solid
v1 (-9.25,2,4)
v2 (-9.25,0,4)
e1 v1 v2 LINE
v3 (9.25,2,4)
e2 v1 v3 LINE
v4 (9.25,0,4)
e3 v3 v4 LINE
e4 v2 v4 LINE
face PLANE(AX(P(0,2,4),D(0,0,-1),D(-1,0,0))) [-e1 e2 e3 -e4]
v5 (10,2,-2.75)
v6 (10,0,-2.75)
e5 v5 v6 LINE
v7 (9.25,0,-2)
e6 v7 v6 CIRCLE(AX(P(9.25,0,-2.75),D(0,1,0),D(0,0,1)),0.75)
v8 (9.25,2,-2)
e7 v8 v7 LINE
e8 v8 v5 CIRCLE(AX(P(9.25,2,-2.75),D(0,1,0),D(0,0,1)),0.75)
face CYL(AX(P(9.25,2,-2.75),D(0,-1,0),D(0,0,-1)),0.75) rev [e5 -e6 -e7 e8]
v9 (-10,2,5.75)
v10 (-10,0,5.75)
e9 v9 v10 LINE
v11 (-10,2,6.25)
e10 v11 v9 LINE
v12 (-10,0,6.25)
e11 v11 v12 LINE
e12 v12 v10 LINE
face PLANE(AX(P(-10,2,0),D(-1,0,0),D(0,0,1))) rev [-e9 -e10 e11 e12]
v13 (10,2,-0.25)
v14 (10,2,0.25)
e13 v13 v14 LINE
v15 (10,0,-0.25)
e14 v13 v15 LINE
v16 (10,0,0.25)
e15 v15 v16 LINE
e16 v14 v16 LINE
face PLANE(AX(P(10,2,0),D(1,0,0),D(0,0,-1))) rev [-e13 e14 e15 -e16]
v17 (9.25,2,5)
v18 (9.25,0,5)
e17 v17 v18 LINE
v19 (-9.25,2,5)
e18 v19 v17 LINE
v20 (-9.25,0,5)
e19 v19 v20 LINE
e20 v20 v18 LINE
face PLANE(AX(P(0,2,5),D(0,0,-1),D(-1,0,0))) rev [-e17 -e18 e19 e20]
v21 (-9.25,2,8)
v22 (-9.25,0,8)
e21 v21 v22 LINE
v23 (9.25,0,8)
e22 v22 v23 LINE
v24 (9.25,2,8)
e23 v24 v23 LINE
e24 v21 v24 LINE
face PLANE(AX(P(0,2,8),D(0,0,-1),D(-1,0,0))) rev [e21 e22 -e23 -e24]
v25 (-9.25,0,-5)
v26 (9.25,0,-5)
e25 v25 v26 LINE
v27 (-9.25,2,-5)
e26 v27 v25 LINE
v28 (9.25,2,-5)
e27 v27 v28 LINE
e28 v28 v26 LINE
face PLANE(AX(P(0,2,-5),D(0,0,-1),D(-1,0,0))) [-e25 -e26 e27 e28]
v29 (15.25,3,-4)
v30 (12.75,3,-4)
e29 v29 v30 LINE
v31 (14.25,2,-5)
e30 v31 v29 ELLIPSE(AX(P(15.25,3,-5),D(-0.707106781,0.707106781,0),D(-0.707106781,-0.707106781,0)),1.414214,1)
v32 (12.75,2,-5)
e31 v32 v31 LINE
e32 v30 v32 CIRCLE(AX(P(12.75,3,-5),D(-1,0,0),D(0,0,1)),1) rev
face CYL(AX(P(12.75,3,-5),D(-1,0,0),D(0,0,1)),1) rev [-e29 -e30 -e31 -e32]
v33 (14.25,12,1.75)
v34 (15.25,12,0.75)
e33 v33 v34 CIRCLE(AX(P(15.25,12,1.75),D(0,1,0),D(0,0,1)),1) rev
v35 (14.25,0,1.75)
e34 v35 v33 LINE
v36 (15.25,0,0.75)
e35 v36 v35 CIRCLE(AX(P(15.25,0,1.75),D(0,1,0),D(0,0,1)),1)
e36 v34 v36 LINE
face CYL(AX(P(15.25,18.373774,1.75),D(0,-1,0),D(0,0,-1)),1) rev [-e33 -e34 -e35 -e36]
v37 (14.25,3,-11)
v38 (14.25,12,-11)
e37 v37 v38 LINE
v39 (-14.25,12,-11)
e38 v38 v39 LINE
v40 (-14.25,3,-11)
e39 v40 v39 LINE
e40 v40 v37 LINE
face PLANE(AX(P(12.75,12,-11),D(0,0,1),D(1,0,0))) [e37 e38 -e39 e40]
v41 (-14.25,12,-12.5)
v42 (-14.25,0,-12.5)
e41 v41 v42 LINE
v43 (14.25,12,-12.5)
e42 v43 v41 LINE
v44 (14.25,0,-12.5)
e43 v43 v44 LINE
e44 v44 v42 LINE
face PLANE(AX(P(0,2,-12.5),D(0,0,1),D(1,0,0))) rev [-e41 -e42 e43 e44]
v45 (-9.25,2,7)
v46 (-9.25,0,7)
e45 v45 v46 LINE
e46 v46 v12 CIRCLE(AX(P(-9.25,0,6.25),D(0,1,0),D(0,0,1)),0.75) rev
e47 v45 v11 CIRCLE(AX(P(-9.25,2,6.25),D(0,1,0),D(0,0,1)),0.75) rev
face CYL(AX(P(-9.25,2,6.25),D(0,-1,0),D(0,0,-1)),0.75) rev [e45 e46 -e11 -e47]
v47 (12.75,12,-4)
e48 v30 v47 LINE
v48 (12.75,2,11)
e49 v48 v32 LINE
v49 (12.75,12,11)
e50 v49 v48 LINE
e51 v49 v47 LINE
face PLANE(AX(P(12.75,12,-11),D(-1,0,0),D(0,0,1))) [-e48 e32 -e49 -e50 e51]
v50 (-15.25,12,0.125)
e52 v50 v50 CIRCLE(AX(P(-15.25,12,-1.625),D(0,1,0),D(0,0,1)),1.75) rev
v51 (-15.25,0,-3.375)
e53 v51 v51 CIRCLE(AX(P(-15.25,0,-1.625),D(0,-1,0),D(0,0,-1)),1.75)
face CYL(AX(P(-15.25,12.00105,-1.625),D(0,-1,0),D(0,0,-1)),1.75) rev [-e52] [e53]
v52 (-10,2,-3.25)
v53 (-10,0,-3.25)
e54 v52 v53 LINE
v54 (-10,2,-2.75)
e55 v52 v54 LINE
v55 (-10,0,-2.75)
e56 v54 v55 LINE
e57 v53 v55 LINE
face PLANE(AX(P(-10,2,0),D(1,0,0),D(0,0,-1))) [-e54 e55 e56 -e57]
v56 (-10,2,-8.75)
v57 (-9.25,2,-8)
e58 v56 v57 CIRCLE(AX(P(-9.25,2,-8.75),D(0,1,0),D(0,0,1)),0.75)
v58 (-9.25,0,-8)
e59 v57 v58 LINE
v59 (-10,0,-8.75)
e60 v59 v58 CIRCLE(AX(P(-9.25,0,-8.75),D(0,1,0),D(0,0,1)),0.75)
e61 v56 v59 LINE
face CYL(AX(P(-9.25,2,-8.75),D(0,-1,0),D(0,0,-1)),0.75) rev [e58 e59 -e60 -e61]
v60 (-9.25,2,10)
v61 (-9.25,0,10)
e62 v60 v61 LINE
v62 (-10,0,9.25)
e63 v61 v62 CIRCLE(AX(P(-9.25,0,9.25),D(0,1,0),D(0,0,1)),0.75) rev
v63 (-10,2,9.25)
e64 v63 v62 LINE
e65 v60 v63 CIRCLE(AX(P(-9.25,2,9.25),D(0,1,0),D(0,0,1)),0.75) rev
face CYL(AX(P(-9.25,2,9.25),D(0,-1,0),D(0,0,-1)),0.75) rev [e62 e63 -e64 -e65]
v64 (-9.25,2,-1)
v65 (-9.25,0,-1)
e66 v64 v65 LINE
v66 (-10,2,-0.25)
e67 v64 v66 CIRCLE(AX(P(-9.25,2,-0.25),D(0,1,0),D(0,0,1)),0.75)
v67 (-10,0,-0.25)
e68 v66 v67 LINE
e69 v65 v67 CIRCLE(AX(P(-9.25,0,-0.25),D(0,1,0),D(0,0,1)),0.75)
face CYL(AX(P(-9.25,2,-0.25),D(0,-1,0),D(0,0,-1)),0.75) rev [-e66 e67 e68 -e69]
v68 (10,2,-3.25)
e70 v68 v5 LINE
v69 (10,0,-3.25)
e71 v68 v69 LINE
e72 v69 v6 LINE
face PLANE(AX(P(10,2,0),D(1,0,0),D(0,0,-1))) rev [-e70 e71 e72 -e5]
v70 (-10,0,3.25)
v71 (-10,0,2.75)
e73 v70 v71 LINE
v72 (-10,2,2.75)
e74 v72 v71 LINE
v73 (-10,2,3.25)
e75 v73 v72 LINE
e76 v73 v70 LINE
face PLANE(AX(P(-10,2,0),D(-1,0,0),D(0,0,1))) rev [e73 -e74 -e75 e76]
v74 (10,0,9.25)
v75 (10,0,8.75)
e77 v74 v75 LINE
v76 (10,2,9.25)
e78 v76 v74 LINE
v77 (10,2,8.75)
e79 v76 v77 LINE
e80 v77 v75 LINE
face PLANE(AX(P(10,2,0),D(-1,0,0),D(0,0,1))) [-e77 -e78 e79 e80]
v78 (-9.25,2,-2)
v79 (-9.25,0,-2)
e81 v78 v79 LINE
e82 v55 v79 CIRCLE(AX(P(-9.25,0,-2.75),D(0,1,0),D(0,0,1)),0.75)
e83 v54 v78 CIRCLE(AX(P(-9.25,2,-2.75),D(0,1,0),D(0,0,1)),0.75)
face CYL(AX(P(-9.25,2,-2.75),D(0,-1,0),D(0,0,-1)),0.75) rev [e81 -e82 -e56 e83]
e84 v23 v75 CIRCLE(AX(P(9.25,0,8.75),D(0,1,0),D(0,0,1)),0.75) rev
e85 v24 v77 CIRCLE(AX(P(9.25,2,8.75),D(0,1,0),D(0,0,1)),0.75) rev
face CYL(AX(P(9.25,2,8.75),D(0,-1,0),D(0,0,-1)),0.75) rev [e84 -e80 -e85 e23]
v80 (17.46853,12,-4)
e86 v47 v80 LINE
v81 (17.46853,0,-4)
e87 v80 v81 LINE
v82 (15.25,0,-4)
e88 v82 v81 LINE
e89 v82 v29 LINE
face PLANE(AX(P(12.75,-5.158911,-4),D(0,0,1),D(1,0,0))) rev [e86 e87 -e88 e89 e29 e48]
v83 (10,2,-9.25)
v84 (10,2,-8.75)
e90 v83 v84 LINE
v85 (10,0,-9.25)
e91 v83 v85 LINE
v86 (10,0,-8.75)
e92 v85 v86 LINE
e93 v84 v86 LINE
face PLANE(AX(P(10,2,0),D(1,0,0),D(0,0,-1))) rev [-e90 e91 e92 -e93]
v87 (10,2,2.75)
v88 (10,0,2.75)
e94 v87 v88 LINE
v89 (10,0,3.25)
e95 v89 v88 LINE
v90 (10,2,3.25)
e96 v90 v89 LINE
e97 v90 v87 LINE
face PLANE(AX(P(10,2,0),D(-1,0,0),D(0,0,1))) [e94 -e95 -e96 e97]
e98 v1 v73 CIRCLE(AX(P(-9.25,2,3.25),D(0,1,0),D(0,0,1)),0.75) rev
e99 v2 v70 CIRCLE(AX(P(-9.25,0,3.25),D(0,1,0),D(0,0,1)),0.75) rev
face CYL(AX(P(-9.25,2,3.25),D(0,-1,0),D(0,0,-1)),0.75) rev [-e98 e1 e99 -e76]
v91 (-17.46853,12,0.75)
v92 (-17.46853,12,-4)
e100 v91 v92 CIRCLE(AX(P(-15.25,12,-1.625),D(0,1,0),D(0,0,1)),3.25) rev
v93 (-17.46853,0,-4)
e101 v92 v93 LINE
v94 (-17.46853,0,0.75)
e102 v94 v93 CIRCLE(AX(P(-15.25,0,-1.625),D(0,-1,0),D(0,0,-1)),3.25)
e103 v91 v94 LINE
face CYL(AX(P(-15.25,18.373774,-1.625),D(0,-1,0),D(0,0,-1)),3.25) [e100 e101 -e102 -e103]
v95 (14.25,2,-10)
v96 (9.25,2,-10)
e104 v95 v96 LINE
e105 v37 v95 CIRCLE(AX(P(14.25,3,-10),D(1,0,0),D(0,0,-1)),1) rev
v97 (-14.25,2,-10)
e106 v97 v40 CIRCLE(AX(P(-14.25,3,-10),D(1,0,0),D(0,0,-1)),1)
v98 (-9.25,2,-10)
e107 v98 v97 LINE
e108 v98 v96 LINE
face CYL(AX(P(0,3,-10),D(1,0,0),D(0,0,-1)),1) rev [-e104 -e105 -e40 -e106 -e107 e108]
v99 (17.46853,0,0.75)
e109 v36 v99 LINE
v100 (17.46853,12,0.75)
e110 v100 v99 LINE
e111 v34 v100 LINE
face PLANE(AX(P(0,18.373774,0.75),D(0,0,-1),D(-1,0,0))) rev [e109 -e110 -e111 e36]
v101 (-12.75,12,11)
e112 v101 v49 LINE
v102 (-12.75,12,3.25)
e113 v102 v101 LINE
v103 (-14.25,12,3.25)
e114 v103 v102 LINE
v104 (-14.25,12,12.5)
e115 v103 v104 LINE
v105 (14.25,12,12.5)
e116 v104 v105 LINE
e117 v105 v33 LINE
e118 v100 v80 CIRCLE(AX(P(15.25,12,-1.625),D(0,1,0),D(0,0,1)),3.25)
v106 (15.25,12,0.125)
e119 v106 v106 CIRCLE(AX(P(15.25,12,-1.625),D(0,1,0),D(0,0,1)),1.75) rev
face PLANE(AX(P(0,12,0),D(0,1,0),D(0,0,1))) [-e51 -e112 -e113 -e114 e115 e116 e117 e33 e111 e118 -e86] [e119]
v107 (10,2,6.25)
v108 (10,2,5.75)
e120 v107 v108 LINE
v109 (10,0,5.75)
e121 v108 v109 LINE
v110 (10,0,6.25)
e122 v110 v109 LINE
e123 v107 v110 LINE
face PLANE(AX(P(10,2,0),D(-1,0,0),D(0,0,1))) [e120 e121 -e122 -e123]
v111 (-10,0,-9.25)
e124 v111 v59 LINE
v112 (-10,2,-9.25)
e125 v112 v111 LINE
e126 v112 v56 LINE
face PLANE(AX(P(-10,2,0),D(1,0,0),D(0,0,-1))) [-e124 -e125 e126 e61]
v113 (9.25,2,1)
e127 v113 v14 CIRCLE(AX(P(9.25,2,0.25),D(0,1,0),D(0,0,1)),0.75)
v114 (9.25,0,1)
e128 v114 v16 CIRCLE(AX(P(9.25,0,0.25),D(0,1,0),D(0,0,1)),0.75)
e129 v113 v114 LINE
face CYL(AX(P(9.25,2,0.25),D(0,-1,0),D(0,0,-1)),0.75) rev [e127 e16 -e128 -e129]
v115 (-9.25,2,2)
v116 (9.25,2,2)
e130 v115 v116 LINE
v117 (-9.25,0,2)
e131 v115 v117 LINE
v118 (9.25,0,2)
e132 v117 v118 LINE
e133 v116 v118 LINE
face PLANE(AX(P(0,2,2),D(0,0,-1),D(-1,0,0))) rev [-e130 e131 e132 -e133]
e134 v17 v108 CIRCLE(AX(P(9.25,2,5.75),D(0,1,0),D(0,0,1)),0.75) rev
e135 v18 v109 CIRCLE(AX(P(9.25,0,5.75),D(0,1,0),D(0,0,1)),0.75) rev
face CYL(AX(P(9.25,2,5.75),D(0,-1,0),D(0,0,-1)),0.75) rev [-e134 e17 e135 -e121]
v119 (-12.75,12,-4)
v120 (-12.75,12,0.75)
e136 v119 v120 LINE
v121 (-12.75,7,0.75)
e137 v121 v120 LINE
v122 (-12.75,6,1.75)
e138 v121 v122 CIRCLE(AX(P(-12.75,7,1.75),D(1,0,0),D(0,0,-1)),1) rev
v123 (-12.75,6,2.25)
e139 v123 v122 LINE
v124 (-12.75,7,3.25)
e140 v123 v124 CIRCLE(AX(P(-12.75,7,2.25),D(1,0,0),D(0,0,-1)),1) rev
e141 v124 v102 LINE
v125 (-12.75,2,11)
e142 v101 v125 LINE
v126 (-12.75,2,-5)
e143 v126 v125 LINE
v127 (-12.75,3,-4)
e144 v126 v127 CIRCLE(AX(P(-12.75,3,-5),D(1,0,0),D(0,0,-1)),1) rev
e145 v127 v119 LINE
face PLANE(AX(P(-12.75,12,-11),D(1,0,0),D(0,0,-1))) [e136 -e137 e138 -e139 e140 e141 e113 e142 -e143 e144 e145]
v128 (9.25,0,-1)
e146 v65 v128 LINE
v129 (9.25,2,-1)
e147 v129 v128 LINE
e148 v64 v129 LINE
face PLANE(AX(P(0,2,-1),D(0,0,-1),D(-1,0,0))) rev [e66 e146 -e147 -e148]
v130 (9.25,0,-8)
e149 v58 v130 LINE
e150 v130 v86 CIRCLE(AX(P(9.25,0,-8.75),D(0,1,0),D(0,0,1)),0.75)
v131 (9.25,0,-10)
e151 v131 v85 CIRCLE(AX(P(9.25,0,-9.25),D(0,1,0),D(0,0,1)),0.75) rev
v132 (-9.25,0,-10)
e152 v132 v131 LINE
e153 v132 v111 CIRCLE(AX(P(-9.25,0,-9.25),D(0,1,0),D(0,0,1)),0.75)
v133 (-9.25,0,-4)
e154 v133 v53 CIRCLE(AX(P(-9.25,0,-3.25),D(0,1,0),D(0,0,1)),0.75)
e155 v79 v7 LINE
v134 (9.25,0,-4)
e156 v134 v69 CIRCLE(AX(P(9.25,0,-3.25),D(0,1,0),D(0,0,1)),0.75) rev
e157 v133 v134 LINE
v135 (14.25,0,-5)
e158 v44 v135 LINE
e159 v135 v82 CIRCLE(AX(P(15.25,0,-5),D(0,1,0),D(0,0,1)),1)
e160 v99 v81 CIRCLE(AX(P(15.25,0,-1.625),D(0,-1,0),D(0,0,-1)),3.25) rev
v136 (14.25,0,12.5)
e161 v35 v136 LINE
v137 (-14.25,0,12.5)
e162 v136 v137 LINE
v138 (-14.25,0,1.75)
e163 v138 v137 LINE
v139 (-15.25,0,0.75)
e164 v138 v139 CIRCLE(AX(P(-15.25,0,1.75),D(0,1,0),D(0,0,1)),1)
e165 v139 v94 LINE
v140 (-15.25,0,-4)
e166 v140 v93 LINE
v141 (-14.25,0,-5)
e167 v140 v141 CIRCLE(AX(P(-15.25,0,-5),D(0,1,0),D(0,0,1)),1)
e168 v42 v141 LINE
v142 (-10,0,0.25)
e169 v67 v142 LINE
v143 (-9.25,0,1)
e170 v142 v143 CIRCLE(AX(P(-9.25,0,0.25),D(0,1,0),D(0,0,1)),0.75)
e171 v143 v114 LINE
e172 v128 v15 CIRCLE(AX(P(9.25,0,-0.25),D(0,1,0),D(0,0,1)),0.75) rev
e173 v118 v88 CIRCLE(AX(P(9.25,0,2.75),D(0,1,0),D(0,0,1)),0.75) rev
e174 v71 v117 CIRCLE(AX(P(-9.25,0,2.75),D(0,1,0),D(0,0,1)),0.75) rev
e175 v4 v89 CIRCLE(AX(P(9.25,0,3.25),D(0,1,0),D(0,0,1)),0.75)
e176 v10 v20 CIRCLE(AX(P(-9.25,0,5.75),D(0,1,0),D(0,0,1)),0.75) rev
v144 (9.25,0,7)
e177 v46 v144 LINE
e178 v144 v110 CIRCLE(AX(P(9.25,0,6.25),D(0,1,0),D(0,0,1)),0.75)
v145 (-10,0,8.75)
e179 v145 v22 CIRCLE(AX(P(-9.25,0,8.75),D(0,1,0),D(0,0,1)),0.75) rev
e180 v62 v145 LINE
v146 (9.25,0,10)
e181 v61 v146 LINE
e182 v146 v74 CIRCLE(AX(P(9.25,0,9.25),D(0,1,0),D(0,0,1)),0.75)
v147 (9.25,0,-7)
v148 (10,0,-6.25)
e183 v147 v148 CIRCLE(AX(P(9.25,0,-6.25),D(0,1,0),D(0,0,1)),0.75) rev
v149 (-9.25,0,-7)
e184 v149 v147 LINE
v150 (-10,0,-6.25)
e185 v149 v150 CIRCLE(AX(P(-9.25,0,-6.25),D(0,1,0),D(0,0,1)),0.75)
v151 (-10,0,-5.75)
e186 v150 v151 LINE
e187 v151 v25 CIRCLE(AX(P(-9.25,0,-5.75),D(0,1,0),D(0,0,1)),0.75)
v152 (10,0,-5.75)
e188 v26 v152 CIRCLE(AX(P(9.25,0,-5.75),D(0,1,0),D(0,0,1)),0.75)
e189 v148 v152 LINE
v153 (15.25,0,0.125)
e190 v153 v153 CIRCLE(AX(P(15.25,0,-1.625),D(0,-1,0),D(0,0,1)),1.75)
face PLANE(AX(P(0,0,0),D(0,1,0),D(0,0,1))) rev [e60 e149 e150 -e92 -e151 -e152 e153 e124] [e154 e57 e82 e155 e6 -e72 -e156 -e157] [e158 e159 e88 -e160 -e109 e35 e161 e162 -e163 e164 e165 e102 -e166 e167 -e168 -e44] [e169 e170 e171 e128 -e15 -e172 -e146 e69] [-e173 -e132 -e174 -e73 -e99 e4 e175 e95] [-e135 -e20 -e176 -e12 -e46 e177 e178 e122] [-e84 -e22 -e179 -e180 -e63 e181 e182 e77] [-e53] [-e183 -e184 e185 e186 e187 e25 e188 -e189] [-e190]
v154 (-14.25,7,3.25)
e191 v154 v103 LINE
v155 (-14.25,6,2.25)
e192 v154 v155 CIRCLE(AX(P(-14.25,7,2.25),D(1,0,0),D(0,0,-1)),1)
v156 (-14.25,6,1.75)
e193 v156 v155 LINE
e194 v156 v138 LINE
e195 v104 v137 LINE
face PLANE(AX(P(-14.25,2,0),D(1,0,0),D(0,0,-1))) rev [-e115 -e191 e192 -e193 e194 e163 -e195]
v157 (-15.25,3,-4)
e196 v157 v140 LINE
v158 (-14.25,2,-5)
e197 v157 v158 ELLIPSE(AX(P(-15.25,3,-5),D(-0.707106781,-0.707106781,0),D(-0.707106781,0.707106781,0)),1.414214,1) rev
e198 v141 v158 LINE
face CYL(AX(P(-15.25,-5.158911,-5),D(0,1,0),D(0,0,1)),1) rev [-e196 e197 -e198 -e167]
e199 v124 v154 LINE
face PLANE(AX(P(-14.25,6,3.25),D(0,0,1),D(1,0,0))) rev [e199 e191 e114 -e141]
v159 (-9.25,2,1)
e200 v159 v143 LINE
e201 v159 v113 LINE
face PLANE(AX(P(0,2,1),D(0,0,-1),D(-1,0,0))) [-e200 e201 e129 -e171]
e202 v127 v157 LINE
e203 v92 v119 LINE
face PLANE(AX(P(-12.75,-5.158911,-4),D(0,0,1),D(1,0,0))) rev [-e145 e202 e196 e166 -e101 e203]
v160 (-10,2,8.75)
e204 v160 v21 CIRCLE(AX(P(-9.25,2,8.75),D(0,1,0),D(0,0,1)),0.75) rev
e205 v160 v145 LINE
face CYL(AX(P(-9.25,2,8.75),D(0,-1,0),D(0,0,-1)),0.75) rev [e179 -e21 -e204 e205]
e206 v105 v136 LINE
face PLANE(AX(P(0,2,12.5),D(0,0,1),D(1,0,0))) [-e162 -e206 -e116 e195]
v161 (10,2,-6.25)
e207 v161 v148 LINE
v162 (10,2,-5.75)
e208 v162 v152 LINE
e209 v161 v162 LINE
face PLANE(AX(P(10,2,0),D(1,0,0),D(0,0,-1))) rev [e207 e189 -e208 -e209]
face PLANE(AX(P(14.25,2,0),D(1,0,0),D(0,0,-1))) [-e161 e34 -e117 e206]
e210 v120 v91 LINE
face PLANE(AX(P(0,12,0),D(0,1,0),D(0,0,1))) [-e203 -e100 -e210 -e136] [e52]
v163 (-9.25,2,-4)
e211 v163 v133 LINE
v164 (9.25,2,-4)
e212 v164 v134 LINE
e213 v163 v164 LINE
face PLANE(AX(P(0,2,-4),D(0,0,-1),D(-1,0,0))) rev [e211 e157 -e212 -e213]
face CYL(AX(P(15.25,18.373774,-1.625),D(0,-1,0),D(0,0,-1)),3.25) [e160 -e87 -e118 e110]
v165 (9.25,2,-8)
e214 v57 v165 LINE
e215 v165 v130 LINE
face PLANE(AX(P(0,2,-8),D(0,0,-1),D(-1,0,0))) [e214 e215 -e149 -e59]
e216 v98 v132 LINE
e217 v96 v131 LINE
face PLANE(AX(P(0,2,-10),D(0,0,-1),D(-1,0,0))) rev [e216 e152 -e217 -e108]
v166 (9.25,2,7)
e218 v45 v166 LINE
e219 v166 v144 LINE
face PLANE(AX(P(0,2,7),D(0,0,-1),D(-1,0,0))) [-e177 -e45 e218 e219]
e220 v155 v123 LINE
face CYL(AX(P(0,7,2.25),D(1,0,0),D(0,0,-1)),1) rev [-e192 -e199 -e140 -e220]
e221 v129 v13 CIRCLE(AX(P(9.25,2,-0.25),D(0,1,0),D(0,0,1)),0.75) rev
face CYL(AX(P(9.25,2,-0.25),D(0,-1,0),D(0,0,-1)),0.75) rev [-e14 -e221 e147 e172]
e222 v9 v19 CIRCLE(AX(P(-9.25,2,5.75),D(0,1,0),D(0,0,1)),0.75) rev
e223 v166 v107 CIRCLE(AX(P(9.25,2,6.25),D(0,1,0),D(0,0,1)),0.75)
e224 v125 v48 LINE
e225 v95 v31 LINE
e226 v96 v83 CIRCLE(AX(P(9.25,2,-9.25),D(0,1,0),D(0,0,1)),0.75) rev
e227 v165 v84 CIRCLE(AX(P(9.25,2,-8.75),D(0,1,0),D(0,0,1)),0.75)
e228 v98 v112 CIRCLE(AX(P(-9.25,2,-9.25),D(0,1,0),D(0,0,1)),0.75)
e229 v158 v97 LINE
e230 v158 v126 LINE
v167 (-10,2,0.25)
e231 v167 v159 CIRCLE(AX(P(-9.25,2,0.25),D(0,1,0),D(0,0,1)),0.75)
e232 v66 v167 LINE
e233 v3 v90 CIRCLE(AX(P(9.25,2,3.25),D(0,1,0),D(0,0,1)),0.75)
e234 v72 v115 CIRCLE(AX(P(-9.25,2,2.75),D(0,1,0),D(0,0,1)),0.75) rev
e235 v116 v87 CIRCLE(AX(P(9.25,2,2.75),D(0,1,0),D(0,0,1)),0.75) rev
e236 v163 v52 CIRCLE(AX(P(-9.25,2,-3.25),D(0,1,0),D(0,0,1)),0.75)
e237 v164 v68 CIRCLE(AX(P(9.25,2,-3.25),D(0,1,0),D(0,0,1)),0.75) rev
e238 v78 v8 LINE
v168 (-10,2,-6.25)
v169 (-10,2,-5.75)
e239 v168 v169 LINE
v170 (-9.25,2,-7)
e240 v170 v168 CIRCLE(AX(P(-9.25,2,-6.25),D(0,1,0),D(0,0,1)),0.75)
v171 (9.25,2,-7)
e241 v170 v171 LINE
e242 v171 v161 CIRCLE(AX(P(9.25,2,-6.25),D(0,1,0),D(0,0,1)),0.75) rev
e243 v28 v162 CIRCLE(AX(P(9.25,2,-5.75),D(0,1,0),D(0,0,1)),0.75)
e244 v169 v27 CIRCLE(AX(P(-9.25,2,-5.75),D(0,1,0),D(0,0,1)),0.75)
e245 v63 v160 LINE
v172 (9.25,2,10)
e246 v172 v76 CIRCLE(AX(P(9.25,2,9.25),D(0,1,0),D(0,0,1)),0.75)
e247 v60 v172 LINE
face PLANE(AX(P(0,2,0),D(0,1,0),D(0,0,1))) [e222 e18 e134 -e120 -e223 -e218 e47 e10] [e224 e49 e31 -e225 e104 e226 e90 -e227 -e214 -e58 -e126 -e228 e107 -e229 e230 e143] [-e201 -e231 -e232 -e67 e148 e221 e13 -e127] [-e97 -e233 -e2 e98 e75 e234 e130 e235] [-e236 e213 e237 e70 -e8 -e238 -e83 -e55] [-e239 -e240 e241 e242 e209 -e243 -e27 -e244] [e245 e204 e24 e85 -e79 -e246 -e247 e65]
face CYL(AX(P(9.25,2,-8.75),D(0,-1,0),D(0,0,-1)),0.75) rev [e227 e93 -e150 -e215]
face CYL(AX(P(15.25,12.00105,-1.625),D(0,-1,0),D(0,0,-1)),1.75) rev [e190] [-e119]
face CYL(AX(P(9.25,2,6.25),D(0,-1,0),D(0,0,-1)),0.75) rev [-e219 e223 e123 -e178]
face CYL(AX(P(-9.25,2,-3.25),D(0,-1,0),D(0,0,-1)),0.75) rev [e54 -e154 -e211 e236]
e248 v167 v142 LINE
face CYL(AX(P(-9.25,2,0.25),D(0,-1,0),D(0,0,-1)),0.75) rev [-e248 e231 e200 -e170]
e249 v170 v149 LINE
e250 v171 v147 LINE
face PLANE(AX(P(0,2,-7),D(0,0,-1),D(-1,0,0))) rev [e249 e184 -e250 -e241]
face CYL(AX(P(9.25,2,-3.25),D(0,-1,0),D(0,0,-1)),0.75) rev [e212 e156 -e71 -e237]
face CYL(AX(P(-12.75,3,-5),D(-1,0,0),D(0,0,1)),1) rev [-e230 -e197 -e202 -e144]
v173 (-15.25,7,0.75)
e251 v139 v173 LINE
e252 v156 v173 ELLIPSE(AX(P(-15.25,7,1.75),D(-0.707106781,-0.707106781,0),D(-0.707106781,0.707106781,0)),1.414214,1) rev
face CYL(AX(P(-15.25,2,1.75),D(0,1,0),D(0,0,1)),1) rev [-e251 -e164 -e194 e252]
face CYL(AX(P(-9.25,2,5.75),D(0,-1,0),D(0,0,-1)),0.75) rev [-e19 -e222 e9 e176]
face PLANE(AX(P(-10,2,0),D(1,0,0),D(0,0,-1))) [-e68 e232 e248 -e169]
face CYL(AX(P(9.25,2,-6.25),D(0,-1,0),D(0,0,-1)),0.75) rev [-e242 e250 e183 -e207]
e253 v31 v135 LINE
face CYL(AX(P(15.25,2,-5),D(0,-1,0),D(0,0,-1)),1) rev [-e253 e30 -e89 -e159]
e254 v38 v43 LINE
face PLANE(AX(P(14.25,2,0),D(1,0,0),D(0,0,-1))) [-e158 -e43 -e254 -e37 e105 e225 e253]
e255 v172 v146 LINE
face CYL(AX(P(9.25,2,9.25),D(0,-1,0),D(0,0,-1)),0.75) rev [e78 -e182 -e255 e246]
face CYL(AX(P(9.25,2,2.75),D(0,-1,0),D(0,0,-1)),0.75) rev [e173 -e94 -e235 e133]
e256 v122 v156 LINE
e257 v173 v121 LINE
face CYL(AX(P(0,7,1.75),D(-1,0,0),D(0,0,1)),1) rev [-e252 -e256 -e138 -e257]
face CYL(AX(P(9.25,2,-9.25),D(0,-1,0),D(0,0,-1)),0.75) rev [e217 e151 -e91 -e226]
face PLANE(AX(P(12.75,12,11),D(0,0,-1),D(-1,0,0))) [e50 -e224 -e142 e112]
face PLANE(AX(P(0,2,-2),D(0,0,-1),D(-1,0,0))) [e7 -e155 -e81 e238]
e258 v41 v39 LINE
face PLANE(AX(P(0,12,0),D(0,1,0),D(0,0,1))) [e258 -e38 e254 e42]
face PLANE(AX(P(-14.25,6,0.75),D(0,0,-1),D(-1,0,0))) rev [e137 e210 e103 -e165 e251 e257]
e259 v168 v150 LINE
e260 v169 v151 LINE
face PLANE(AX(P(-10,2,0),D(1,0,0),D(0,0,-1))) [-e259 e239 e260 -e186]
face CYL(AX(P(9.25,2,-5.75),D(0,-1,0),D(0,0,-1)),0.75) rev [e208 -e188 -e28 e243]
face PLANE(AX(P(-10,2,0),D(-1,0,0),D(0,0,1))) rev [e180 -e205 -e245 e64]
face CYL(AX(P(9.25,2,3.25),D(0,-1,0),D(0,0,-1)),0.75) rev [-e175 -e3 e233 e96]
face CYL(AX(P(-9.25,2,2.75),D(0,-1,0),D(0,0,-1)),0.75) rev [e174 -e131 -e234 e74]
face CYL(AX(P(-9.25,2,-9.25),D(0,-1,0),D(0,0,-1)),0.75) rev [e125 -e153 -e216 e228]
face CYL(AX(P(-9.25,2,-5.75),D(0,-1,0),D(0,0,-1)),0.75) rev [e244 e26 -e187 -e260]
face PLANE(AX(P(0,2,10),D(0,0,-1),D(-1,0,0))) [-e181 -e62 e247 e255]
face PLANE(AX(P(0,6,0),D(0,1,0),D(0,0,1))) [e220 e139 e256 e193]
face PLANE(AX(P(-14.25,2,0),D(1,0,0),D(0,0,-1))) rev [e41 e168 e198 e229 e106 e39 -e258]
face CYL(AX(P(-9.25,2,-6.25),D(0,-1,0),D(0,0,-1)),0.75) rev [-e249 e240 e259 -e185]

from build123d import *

# Parameters (mm, degrees)
SKETCH1_W           = 28.5
SKETCH1_H           = 25
BOSS_EXTRUDE1_DEPTH = 2
SKETCH2_W           = 28.5
SKETCH2_H           = 25
SKETCH2_W_2         = 25.5
SKETCH2_H_2         = 22
BOSS_EXTRUDE2_DEPTH = 10
SKETCH3_W           = 1.5
SKETCH3_H           = 7
CUT_EXTRUDE1_DEPTH  = 10
SKETCH4_W           = 1.5
SKETCH4_H           = 2.5
CUT_EXTRUDE2_DEPTH  = 6
BOSS_EXTRUDE3_DEPTH = 12
CUT_EXTRUDE3_REACH  = 27.348
SKETCH6_R           = 1.75
FILLET1_R           = 1


with BuildPart() as part:
    # Sketch1 → Boss-Extrude1 (new body)
    with BuildSketch(Plane(origin=(0, 0, 0), x_dir=(1, 0, 0), z_dir=(0, 1, 0))):
        Rectangle(SKETCH1_W, SKETCH1_H)
        with BuildLine():
            Line((-9.25, 5), (9.25, 5))
            ThreePointArc((9.25, 5), (9.780330086, 5.219669914), (10, 5.75))
            Line((10, 5.75), (10, 6.25))
            ThreePointArc((10, 6.25), (9.780330086, 6.780330086), (9.25, 7))
            Line((9.25, 7), (-9.25, 7))
            ThreePointArc((-9.25, 7), (-9.780330086, 6.780330086), (-10, 6.25))
            Line((-10, 6.25), (-10, 5.75))
            ThreePointArc((-10, 5.75), (-9.780330086, 5.219669914), (-9.25, 5))
        make_face(mode=Mode.SUBTRACT)
        with BuildLine():
            Line((-9.25, 4), (9.25, 4))
            ThreePointArc((9.25, 4), (9.780330086, 3.780330086), (10, 3.25))
            Line((10, 3.25), (10, 2.75))
            ThreePointArc((10, 2.75), (9.780330086, 2.219669914), (9.25, 2))
            Line((9.25, 2), (-9.25, 2))
            ThreePointArc((-9.25, 2), (-9.780330086, 2.219669914), (-10, 2.75))
            Line((-10, 2.75), (-10, 3.25))
            ThreePointArc((-10, 3.25), (-9.780330086, 3.780330086), (-9.25, 4))
        make_face(mode=Mode.SUBTRACT)
        with BuildLine():
            Line((-9.25, 8), (9.25, 8))
            ThreePointArc((9.25, 8), (9.780330086, 8.219669914), (10, 8.75))
            Line((10, 8.75), (10, 9.25))
            ThreePointArc((10, 9.25), (9.780330086, 9.780330086), (9.25, 10))
            Line((9.25, 10), (-9.25, 10))
            ThreePointArc((-9.25, 10), (-9.780330086, 9.780330086), (-10, 9.25))
            Line((-10, 9.25), (-10, 8.75))
            ThreePointArc((-10, 8.75), (-9.780330086, 8.219669914), (-9.25, 8))
        make_face(mode=Mode.SUBTRACT)
        with BuildLine():
            Line((10, -9.25), (10, -8.75))
            ThreePointArc((10, -8.75), (9.780330086, -8.219669914), (9.25, -8))
            Line((9.25, -8), (-9.25, -8))
            ThreePointArc((-9.25, -8), (-9.780330086, -8.219669914), (-10, -8.75))
            Line((-10, -8.75), (-10, -9.25))
            ThreePointArc((-10, -9.25), (-9.780330086, -9.780330086), (-9.25, -10))
            Line((-9.25, -10), (9.25, -10))
            ThreePointArc((9.25, -10), (9.780330086, -9.780330086), (10, -9.25))
        make_face(mode=Mode.SUBTRACT)
        with BuildLine():
            Line((10, -6.25), (10, -5.75))
            ThreePointArc((10, -5.75), (9.780330086, -5.219669914), (9.25, -5))
            Line((9.25, -5), (-9.25, -5))
            ThreePointArc((-9.25, -5), (-9.780330086, -5.219669914), (-10, -5.75))
            Line((-10, -5.75), (-10, -6.25))
            ThreePointArc((-10, -6.25), (-9.780330086, -6.780330086), (-9.25, -7))
            Line((-9.25, -7), (9.25, -7))
            ThreePointArc((9.25, -7), (9.780330086, -6.780330086), (10, -6.25))
        make_face(mode=Mode.SUBTRACT)
        with BuildLine():
            Line((10, -3.25), (10, -2.75))
            ThreePointArc((10, -2.75), (9.780330086, -2.219669914), (9.25, -2))
            Line((9.25, -2), (-9.25, -2))
            ThreePointArc((-9.25, -2), (-9.780330086, -2.219669914), (-10, -2.75))
            Line((-10, -2.75), (-10, -3.25))
            ThreePointArc((-10, -3.25), (-9.780330086, -3.780330086), (-9.25, -4))
            Line((-9.25, -4), (9.25, -4))
            ThreePointArc((9.25, -4), (9.780330086, -3.780330086), (10, -3.25))
        make_face(mode=Mode.SUBTRACT)
        with BuildLine():
            Line((-10, 0.25), (-10, -0.25))
            ThreePointArc((-10, -0.25), (-9.780330086, -0.780330086), (-9.25, -1))
            Line((-9.25, -1), (9.25, -1))
            ThreePointArc((9.25, -1), (9.780330086, -0.780330086), (10, -0.25))
            Line((10, -0.25), (10, 0.25))
            ThreePointArc((10, 0.25), (9.780330086, 0.780330086), (9.25, 1))
            Line((9.25, 1), (-9.25, 1))
            ThreePointArc((-9.25, 1), (-9.780330086, 0.780330086), (-10, 0.25))
        make_face(mode=Mode.SUBTRACT)
    extrude(amount=BOSS_EXTRUDE1_DEPTH)

    # Sketch2 → Boss-Extrude2 (add)
    with BuildSketch(Plane(origin=(0, 2, 0), x_dir=(1, 0, 0), z_dir=(0, 1, 0))):
        Rectangle(SKETCH2_W, SKETCH2_H)
        Rectangle(SKETCH2_W_2, SKETCH2_H_2, mode=Mode.SUBTRACT)
    extrude(amount=BOSS_EXTRUDE2_DEPTH)

    # Sketch3 → Cut-Extrude1 (cut)
    with BuildSketch(Plane(origin=(0, 12, 0), x_dir=(1, 0, 0), z_dir=(0, 1, 0))):
        with Locations((-13.5, 7.5)):
            Rectangle(SKETCH3_W, SKETCH3_H)
        with Locations((13.5, 7.5)):
            Rectangle(SKETCH3_W, SKETCH3_H)
    extrude(amount=-CUT_EXTRUDE1_DEPTH, mode=Mode.SUBTRACT)

    # Sketch4 → Cut-Extrude2 (cut)
    with BuildSketch(Plane(origin=(0, 12, 0), x_dir=(1, 0, 0), z_dir=(0, 1, 0))):
        with Locations((-13.5, -2)):
            Rectangle(SKETCH4_W, SKETCH4_H)
    extrude(amount=-CUT_EXTRUDE2_DEPTH, mode=Mode.SUBTRACT)

    # Sketch5 → Boss-Extrude3 (add)
    with BuildSketch(Plane.XZ):
        with BuildLine():
            Line((-17.468529919, -4), (-14.25, -4))
            Line((-14.25, -4), (-14.25, 0.75))
            Line((-14.25, 0.75), (-17.468529919, 0.75))
            ThreePointArc((-17.468529919, 0.75), (-18.5, -1.625), (-17.468529919, -4))
        make_face()
        with BuildLine():
            Line((14.25, 0.75), (14.25, -4))
            Line((14.25, -4), (17.468529919, -4))
            ThreePointArc((17.468529919, -4), (18.5, -1.625), (17.468529919, 0.75))
            Line((17.468529919, 0.75), (14.25, 0.75))
        make_face()
    extrude(amount=-BOSS_EXTRUDE3_DEPTH)

    # Sketch6 → Cut-Extrude3 (cut, up to next)
    with BuildSketch(Plane.XZ, mode=Mode.PRIVATE) as cut_extrude3_sk1:
        with Locations(Location((-15.25, -1.625, 0), (0, 0, 270))):
            Circle(SKETCH6_R)
    cut_extrude3_tool1 = extrude(cut_extrude3_sk1.sketch, amount=-CUT_EXTRUDE3_REACH, mode=Mode.PRIVATE) & part.part
    # Sketch6 → Cut-Extrude3 (cut, up to next)
    with BuildSketch(Plane.XZ, mode=Mode.PRIVATE) as cut_extrude3_sk2:
        with Locations(Location((15.25, -1.625, 0), (0, 0, 90))):
            Circle(SKETCH6_R)
    cut_extrude3_tool2 = extrude(cut_extrude3_sk2.sketch, amount=-CUT_EXTRUDE3_REACH, mode=Mode.PRIVATE) & part.part
    add(cut_extrude3_tool1.solids().sort_by_distance((-15.25, 0, -1.625))[0], mode=Mode.SUBTRACT)
    add(cut_extrude3_tool2.solids().sort_by_distance((15.25, 0, -1.625))[0], mode=Mode.SUBTRACT)

    # Fillet1
    fillet1_edges = [part.edges().sort_by_distance(p)[0] for p in [
        (-14.25, 1, -4),
        (14.25, 1, -4),
        (-14.25, 3, 0.75),
        (14.25, 6, 0.75),
        (-13.5, 6, 0.75),
        (-13.5, 6, 3.25),
        (13.5, 2, -4),
        (-13.5, 2, -4),
        (0, 2, -11),
    ]]
    fillet(fillet1_edges, radius=FILLET1_R - 0.0001)  # a hair under: the kernel refuses the full size


solid = part.part
